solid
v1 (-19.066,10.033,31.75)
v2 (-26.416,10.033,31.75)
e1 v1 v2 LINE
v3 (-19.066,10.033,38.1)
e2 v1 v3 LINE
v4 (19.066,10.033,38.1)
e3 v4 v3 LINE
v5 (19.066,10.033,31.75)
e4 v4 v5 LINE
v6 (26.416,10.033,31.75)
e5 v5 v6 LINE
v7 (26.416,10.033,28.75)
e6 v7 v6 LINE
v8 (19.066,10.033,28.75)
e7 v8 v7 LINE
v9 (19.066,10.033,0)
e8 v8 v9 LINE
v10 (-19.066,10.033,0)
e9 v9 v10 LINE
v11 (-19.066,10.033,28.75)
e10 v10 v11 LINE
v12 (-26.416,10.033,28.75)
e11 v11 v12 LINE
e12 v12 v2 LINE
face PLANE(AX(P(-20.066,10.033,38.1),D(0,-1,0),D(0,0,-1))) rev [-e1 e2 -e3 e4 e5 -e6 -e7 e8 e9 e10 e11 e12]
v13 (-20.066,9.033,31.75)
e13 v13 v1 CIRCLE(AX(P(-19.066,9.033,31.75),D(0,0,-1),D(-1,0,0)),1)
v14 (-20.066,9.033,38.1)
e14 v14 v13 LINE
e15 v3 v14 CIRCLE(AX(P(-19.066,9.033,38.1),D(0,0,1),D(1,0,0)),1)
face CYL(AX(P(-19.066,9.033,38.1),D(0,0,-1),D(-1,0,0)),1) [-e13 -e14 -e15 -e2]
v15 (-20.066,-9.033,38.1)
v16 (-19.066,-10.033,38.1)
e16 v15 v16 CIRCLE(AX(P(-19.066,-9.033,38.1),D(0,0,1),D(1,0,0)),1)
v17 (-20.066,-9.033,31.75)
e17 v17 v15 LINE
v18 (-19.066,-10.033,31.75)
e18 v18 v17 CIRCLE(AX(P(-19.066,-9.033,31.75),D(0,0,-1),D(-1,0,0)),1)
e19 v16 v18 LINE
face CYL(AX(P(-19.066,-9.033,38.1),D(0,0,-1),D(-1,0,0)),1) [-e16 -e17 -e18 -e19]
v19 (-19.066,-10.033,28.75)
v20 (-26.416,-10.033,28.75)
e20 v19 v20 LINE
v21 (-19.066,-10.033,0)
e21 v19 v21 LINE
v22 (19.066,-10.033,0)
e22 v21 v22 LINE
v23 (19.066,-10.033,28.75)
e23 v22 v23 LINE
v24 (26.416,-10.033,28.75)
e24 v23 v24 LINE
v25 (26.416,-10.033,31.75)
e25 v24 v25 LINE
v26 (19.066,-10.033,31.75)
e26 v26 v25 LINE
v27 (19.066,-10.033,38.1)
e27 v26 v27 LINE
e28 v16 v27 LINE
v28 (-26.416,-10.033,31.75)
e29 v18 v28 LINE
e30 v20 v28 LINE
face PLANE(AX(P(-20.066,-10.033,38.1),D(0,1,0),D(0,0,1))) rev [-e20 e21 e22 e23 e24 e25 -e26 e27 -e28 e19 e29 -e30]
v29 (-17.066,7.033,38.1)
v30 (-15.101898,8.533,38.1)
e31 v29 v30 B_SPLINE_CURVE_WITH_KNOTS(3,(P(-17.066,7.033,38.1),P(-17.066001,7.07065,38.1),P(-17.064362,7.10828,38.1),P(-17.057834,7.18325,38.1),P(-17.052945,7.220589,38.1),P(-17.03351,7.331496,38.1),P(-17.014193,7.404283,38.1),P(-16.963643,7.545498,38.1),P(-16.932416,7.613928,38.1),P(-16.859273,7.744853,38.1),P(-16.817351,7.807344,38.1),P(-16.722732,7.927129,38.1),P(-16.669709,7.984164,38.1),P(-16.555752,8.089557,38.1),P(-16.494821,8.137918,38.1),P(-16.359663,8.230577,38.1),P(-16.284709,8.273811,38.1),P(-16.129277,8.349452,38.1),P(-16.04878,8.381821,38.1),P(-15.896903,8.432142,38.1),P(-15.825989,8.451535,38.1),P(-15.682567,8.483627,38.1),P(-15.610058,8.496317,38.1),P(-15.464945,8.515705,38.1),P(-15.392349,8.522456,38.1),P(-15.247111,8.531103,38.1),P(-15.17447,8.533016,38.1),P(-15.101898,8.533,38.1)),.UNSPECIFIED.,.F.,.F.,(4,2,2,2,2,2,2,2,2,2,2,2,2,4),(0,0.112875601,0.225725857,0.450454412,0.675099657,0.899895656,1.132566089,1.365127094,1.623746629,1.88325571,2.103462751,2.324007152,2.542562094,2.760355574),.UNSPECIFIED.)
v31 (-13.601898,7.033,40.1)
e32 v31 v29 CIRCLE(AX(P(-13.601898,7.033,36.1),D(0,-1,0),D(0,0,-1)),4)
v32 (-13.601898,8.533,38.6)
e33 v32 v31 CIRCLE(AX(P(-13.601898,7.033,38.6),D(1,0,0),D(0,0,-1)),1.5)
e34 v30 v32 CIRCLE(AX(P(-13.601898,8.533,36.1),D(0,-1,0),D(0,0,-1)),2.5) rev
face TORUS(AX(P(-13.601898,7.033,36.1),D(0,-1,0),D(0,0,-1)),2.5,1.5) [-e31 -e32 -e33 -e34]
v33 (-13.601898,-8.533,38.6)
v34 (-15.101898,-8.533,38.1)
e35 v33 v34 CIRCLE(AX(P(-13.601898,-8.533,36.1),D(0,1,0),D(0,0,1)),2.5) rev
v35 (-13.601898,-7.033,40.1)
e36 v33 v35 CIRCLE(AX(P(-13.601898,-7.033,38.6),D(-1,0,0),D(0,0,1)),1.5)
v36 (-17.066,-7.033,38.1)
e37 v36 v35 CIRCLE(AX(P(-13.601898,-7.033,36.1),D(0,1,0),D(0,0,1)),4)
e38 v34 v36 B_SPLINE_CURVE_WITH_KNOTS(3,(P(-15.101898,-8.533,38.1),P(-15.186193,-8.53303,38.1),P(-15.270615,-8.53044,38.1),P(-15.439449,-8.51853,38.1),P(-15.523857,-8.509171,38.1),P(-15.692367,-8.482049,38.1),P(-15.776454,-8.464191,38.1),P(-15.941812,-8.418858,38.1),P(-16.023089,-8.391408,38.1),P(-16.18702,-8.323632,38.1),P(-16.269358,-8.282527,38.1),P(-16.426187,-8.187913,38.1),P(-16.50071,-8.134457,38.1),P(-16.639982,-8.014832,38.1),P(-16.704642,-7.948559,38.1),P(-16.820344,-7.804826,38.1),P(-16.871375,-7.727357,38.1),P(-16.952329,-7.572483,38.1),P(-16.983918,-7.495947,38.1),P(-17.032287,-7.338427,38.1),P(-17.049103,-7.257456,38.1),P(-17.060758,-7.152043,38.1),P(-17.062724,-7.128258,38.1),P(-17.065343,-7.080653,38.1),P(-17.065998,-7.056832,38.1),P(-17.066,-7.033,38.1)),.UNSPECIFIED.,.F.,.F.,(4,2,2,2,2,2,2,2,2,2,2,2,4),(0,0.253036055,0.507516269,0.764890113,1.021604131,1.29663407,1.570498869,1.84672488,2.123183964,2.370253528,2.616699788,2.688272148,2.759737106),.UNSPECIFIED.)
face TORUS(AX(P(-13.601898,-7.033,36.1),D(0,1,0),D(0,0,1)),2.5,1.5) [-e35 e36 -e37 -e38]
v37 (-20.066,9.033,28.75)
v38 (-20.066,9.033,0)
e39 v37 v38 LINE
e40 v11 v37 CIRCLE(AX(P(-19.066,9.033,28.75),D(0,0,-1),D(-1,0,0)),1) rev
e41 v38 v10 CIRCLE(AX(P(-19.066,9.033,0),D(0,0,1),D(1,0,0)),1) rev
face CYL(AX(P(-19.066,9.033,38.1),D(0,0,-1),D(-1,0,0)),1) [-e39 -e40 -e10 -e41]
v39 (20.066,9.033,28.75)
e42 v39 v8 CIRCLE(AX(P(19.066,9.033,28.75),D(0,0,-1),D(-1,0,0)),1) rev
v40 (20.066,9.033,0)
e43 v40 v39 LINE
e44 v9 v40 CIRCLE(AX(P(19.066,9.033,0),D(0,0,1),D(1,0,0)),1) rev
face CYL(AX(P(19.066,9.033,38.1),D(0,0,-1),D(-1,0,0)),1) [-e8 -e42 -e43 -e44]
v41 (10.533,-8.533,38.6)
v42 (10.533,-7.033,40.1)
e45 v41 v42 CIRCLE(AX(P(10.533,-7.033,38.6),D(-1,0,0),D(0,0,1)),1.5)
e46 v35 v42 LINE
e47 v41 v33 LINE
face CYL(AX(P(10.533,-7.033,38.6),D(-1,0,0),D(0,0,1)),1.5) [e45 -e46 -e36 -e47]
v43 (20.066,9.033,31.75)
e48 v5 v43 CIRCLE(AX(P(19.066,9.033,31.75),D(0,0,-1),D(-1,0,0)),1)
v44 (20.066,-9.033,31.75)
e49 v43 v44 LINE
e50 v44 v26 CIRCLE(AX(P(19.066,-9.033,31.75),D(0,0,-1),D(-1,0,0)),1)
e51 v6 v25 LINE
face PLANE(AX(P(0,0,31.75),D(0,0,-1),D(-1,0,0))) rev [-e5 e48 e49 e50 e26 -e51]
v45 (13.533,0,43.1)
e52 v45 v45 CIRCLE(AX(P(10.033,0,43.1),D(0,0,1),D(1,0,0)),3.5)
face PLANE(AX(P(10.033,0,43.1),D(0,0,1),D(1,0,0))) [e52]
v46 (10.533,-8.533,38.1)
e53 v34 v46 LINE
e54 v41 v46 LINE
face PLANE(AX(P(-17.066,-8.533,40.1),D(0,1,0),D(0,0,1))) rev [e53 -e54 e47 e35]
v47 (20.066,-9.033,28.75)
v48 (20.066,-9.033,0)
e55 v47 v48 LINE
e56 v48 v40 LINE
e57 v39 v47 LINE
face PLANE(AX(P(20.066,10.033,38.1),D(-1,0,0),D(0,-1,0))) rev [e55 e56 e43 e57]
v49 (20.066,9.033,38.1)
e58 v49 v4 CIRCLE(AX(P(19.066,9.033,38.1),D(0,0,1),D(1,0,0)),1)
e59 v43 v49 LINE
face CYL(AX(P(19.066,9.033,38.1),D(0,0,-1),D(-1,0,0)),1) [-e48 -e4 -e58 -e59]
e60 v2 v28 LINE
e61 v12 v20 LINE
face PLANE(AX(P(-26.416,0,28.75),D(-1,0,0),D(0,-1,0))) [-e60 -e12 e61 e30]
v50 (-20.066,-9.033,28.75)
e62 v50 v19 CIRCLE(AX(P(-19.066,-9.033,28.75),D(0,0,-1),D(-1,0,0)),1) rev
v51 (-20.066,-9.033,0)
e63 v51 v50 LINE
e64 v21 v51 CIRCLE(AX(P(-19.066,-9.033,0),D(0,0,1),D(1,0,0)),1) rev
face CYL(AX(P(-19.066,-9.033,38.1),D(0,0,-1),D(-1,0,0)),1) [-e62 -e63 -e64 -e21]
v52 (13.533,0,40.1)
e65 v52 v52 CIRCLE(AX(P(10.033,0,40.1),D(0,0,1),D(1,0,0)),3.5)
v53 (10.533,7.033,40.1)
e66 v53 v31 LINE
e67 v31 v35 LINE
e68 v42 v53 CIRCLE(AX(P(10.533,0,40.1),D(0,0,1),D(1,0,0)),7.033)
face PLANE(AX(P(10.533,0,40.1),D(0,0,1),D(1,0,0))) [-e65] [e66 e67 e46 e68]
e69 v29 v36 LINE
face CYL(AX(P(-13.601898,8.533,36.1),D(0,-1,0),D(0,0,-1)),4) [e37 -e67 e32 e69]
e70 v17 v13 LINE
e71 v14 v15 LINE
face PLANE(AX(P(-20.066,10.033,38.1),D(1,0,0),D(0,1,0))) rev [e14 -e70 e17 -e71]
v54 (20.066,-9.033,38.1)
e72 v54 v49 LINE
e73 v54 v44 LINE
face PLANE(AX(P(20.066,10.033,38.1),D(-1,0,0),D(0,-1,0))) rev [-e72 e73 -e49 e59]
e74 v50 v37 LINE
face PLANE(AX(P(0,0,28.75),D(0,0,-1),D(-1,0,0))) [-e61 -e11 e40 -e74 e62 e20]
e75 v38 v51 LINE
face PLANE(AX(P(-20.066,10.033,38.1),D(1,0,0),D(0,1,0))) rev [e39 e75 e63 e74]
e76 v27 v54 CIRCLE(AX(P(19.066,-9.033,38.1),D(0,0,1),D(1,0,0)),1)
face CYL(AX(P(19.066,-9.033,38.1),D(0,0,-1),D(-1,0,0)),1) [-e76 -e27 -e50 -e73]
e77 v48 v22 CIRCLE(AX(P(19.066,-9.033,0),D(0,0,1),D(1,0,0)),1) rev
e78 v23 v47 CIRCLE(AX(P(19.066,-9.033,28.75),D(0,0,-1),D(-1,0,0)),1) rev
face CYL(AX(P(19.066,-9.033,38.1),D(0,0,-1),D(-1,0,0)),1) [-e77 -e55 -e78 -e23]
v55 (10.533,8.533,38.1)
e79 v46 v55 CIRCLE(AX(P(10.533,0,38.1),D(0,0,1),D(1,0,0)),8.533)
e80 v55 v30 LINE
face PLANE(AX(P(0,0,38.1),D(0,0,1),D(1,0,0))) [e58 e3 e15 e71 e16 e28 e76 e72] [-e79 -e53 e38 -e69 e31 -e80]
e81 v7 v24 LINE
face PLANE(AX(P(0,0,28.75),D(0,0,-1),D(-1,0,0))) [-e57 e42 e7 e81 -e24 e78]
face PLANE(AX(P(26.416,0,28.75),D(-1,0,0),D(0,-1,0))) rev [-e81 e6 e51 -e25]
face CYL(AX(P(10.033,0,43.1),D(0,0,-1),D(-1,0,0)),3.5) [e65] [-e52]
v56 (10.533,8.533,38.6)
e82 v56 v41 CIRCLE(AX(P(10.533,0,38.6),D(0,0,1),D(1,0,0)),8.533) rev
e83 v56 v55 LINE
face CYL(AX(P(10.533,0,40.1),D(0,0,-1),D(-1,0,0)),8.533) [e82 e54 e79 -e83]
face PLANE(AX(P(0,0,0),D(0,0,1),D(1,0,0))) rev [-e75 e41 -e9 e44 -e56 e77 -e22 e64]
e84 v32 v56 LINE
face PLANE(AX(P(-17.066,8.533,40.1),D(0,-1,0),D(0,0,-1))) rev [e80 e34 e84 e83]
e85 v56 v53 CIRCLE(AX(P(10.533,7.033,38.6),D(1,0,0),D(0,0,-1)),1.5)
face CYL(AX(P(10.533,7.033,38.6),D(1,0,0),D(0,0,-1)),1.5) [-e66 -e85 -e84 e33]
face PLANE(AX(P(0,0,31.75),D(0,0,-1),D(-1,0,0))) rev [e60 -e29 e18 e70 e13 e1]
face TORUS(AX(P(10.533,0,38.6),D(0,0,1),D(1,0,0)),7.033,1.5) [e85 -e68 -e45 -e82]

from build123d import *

# Parameters (mm, degrees)
SKETCH1_W           = 40.132
SKETCH1_H           = 20.066
BOSS_EXTRUDE1_DEPTH = 38.1
SKETCH2_W           = 6.35
SKETCH2_H           = 20.066
BOSS_EXTRUDE2_DEPTH = 3
BOSS_EXTRUDE4_DEPTH = 2
SKETCH5_R           = 3.5
BOSS_EXTRUDE3_DEPTH = 3
FILLET2_R           = 4
FILLET3_R           = 1.5
FILLET4_R           = 1


with BuildPart() as part:
    # Sketch1 → Boss-Extrude1 (new body)
    with BuildSketch(Plane.XY):
        Rectangle(SKETCH1_W, SKETCH1_H)
    extrude(amount=BOSS_EXTRUDE1_DEPTH)

    # Sketch2 → Boss-Extrude2 (add)
    with BuildSketch(Plane(origin=(0, 0, 31.75), x_dir=(-1, 0, 0), z_dir=(0, 0, -1))):
        with Locations((23.241, 0)):
            Rectangle(SKETCH2_W, SKETCH2_H)
        with Locations((-23.241, 0)):
            Rectangle(SKETCH2_W, SKETCH2_H)
    extrude(amount=BOSS_EXTRUDE2_DEPTH)

    # Sketch6 → Boss-Extrude4 (add)
    with BuildSketch(Plane.XY.offset(38.1)):
        with BuildLine():
            Line((-17.066, 8.533), (10.533, 8.533))
            ThreePointArc((10.533, 8.533), (19.066, 0), (10.533, -8.533))
            Line((10.533, -8.533), (-17.066, -8.533))
            Line((-17.066, -8.533), (-17.066, 8.533))
        make_face()
    extrude(amount=BOSS_EXTRUDE4_DEPTH)

    # Sketch5 → Boss-Extrude3 (add)
    with BuildSketch(Plane.XY.offset(40.1)):
        with Locations((10.033, 0)):
            Circle(SKETCH5_R)
    extrude(amount=BOSS_EXTRUDE3_DEPTH)

    # Fillet2
    # the kernel refuses this fillet: 4 mm, written as the material it takes off along each edge
    with BuildSketch(Plane(origin=(-17.066, -17.193254038, 40.1), x_dir=(0, 0, -1), z_dir=(0, 1, 0))) as fillet2_piece_1:
        with BuildLine():
            CenterArc((4, -3.464101615), FILLET2_R, 120, 60)
            Line((0, -3.464101615), (-0.08, -3.464101615))
            Line((-0.08, -3.464101615), (-0.08, 0))
            Line((-0.08, 0), (0, 0.08))
            ThreePointArc((0, 0.08), (1, 0.08), (1.96, 0.069282032))
            Line((1.96, 0.069282032), (2, 0))
        make_face()
    extrude(amount=34.386508076, mode=Mode.SUBTRACT)

    # Fillet3
    fillet3_edges = [part.edges().sort_by_distance(p)[0] for p in [
        (19.066, 0, 40.1),
        (-1.534449192, 8.533, 40.1),
        (-1.534449192, -8.533, 40.1),
        (-15.601898385, -8.533, 39.564101615),
        (-15.601898385, 8.533, 39.564101615),
    ]]
    fillet(fillet3_edges, radius=FILLET3_R)

    # Fillet4
    fillet4_edges = [part.edges().sort_by_distance(p)[0] for p in [
        (-20.066, -10.033, 14.375),
        (-20.066, 10.033, 14.375),
        (20.066, 10.033, 14.375),
        (20.066, -10.033, 14.375),
        (20.066, -10.033, 34.925),
        (-20.066, -10.033, 34.925),
        (-20.066, 10.033, 34.925),
        (20.066, 10.033, 34.925),
    ]]
    fillet(fillet4_edges, radius=FILLET4_R)


solid = part.part
